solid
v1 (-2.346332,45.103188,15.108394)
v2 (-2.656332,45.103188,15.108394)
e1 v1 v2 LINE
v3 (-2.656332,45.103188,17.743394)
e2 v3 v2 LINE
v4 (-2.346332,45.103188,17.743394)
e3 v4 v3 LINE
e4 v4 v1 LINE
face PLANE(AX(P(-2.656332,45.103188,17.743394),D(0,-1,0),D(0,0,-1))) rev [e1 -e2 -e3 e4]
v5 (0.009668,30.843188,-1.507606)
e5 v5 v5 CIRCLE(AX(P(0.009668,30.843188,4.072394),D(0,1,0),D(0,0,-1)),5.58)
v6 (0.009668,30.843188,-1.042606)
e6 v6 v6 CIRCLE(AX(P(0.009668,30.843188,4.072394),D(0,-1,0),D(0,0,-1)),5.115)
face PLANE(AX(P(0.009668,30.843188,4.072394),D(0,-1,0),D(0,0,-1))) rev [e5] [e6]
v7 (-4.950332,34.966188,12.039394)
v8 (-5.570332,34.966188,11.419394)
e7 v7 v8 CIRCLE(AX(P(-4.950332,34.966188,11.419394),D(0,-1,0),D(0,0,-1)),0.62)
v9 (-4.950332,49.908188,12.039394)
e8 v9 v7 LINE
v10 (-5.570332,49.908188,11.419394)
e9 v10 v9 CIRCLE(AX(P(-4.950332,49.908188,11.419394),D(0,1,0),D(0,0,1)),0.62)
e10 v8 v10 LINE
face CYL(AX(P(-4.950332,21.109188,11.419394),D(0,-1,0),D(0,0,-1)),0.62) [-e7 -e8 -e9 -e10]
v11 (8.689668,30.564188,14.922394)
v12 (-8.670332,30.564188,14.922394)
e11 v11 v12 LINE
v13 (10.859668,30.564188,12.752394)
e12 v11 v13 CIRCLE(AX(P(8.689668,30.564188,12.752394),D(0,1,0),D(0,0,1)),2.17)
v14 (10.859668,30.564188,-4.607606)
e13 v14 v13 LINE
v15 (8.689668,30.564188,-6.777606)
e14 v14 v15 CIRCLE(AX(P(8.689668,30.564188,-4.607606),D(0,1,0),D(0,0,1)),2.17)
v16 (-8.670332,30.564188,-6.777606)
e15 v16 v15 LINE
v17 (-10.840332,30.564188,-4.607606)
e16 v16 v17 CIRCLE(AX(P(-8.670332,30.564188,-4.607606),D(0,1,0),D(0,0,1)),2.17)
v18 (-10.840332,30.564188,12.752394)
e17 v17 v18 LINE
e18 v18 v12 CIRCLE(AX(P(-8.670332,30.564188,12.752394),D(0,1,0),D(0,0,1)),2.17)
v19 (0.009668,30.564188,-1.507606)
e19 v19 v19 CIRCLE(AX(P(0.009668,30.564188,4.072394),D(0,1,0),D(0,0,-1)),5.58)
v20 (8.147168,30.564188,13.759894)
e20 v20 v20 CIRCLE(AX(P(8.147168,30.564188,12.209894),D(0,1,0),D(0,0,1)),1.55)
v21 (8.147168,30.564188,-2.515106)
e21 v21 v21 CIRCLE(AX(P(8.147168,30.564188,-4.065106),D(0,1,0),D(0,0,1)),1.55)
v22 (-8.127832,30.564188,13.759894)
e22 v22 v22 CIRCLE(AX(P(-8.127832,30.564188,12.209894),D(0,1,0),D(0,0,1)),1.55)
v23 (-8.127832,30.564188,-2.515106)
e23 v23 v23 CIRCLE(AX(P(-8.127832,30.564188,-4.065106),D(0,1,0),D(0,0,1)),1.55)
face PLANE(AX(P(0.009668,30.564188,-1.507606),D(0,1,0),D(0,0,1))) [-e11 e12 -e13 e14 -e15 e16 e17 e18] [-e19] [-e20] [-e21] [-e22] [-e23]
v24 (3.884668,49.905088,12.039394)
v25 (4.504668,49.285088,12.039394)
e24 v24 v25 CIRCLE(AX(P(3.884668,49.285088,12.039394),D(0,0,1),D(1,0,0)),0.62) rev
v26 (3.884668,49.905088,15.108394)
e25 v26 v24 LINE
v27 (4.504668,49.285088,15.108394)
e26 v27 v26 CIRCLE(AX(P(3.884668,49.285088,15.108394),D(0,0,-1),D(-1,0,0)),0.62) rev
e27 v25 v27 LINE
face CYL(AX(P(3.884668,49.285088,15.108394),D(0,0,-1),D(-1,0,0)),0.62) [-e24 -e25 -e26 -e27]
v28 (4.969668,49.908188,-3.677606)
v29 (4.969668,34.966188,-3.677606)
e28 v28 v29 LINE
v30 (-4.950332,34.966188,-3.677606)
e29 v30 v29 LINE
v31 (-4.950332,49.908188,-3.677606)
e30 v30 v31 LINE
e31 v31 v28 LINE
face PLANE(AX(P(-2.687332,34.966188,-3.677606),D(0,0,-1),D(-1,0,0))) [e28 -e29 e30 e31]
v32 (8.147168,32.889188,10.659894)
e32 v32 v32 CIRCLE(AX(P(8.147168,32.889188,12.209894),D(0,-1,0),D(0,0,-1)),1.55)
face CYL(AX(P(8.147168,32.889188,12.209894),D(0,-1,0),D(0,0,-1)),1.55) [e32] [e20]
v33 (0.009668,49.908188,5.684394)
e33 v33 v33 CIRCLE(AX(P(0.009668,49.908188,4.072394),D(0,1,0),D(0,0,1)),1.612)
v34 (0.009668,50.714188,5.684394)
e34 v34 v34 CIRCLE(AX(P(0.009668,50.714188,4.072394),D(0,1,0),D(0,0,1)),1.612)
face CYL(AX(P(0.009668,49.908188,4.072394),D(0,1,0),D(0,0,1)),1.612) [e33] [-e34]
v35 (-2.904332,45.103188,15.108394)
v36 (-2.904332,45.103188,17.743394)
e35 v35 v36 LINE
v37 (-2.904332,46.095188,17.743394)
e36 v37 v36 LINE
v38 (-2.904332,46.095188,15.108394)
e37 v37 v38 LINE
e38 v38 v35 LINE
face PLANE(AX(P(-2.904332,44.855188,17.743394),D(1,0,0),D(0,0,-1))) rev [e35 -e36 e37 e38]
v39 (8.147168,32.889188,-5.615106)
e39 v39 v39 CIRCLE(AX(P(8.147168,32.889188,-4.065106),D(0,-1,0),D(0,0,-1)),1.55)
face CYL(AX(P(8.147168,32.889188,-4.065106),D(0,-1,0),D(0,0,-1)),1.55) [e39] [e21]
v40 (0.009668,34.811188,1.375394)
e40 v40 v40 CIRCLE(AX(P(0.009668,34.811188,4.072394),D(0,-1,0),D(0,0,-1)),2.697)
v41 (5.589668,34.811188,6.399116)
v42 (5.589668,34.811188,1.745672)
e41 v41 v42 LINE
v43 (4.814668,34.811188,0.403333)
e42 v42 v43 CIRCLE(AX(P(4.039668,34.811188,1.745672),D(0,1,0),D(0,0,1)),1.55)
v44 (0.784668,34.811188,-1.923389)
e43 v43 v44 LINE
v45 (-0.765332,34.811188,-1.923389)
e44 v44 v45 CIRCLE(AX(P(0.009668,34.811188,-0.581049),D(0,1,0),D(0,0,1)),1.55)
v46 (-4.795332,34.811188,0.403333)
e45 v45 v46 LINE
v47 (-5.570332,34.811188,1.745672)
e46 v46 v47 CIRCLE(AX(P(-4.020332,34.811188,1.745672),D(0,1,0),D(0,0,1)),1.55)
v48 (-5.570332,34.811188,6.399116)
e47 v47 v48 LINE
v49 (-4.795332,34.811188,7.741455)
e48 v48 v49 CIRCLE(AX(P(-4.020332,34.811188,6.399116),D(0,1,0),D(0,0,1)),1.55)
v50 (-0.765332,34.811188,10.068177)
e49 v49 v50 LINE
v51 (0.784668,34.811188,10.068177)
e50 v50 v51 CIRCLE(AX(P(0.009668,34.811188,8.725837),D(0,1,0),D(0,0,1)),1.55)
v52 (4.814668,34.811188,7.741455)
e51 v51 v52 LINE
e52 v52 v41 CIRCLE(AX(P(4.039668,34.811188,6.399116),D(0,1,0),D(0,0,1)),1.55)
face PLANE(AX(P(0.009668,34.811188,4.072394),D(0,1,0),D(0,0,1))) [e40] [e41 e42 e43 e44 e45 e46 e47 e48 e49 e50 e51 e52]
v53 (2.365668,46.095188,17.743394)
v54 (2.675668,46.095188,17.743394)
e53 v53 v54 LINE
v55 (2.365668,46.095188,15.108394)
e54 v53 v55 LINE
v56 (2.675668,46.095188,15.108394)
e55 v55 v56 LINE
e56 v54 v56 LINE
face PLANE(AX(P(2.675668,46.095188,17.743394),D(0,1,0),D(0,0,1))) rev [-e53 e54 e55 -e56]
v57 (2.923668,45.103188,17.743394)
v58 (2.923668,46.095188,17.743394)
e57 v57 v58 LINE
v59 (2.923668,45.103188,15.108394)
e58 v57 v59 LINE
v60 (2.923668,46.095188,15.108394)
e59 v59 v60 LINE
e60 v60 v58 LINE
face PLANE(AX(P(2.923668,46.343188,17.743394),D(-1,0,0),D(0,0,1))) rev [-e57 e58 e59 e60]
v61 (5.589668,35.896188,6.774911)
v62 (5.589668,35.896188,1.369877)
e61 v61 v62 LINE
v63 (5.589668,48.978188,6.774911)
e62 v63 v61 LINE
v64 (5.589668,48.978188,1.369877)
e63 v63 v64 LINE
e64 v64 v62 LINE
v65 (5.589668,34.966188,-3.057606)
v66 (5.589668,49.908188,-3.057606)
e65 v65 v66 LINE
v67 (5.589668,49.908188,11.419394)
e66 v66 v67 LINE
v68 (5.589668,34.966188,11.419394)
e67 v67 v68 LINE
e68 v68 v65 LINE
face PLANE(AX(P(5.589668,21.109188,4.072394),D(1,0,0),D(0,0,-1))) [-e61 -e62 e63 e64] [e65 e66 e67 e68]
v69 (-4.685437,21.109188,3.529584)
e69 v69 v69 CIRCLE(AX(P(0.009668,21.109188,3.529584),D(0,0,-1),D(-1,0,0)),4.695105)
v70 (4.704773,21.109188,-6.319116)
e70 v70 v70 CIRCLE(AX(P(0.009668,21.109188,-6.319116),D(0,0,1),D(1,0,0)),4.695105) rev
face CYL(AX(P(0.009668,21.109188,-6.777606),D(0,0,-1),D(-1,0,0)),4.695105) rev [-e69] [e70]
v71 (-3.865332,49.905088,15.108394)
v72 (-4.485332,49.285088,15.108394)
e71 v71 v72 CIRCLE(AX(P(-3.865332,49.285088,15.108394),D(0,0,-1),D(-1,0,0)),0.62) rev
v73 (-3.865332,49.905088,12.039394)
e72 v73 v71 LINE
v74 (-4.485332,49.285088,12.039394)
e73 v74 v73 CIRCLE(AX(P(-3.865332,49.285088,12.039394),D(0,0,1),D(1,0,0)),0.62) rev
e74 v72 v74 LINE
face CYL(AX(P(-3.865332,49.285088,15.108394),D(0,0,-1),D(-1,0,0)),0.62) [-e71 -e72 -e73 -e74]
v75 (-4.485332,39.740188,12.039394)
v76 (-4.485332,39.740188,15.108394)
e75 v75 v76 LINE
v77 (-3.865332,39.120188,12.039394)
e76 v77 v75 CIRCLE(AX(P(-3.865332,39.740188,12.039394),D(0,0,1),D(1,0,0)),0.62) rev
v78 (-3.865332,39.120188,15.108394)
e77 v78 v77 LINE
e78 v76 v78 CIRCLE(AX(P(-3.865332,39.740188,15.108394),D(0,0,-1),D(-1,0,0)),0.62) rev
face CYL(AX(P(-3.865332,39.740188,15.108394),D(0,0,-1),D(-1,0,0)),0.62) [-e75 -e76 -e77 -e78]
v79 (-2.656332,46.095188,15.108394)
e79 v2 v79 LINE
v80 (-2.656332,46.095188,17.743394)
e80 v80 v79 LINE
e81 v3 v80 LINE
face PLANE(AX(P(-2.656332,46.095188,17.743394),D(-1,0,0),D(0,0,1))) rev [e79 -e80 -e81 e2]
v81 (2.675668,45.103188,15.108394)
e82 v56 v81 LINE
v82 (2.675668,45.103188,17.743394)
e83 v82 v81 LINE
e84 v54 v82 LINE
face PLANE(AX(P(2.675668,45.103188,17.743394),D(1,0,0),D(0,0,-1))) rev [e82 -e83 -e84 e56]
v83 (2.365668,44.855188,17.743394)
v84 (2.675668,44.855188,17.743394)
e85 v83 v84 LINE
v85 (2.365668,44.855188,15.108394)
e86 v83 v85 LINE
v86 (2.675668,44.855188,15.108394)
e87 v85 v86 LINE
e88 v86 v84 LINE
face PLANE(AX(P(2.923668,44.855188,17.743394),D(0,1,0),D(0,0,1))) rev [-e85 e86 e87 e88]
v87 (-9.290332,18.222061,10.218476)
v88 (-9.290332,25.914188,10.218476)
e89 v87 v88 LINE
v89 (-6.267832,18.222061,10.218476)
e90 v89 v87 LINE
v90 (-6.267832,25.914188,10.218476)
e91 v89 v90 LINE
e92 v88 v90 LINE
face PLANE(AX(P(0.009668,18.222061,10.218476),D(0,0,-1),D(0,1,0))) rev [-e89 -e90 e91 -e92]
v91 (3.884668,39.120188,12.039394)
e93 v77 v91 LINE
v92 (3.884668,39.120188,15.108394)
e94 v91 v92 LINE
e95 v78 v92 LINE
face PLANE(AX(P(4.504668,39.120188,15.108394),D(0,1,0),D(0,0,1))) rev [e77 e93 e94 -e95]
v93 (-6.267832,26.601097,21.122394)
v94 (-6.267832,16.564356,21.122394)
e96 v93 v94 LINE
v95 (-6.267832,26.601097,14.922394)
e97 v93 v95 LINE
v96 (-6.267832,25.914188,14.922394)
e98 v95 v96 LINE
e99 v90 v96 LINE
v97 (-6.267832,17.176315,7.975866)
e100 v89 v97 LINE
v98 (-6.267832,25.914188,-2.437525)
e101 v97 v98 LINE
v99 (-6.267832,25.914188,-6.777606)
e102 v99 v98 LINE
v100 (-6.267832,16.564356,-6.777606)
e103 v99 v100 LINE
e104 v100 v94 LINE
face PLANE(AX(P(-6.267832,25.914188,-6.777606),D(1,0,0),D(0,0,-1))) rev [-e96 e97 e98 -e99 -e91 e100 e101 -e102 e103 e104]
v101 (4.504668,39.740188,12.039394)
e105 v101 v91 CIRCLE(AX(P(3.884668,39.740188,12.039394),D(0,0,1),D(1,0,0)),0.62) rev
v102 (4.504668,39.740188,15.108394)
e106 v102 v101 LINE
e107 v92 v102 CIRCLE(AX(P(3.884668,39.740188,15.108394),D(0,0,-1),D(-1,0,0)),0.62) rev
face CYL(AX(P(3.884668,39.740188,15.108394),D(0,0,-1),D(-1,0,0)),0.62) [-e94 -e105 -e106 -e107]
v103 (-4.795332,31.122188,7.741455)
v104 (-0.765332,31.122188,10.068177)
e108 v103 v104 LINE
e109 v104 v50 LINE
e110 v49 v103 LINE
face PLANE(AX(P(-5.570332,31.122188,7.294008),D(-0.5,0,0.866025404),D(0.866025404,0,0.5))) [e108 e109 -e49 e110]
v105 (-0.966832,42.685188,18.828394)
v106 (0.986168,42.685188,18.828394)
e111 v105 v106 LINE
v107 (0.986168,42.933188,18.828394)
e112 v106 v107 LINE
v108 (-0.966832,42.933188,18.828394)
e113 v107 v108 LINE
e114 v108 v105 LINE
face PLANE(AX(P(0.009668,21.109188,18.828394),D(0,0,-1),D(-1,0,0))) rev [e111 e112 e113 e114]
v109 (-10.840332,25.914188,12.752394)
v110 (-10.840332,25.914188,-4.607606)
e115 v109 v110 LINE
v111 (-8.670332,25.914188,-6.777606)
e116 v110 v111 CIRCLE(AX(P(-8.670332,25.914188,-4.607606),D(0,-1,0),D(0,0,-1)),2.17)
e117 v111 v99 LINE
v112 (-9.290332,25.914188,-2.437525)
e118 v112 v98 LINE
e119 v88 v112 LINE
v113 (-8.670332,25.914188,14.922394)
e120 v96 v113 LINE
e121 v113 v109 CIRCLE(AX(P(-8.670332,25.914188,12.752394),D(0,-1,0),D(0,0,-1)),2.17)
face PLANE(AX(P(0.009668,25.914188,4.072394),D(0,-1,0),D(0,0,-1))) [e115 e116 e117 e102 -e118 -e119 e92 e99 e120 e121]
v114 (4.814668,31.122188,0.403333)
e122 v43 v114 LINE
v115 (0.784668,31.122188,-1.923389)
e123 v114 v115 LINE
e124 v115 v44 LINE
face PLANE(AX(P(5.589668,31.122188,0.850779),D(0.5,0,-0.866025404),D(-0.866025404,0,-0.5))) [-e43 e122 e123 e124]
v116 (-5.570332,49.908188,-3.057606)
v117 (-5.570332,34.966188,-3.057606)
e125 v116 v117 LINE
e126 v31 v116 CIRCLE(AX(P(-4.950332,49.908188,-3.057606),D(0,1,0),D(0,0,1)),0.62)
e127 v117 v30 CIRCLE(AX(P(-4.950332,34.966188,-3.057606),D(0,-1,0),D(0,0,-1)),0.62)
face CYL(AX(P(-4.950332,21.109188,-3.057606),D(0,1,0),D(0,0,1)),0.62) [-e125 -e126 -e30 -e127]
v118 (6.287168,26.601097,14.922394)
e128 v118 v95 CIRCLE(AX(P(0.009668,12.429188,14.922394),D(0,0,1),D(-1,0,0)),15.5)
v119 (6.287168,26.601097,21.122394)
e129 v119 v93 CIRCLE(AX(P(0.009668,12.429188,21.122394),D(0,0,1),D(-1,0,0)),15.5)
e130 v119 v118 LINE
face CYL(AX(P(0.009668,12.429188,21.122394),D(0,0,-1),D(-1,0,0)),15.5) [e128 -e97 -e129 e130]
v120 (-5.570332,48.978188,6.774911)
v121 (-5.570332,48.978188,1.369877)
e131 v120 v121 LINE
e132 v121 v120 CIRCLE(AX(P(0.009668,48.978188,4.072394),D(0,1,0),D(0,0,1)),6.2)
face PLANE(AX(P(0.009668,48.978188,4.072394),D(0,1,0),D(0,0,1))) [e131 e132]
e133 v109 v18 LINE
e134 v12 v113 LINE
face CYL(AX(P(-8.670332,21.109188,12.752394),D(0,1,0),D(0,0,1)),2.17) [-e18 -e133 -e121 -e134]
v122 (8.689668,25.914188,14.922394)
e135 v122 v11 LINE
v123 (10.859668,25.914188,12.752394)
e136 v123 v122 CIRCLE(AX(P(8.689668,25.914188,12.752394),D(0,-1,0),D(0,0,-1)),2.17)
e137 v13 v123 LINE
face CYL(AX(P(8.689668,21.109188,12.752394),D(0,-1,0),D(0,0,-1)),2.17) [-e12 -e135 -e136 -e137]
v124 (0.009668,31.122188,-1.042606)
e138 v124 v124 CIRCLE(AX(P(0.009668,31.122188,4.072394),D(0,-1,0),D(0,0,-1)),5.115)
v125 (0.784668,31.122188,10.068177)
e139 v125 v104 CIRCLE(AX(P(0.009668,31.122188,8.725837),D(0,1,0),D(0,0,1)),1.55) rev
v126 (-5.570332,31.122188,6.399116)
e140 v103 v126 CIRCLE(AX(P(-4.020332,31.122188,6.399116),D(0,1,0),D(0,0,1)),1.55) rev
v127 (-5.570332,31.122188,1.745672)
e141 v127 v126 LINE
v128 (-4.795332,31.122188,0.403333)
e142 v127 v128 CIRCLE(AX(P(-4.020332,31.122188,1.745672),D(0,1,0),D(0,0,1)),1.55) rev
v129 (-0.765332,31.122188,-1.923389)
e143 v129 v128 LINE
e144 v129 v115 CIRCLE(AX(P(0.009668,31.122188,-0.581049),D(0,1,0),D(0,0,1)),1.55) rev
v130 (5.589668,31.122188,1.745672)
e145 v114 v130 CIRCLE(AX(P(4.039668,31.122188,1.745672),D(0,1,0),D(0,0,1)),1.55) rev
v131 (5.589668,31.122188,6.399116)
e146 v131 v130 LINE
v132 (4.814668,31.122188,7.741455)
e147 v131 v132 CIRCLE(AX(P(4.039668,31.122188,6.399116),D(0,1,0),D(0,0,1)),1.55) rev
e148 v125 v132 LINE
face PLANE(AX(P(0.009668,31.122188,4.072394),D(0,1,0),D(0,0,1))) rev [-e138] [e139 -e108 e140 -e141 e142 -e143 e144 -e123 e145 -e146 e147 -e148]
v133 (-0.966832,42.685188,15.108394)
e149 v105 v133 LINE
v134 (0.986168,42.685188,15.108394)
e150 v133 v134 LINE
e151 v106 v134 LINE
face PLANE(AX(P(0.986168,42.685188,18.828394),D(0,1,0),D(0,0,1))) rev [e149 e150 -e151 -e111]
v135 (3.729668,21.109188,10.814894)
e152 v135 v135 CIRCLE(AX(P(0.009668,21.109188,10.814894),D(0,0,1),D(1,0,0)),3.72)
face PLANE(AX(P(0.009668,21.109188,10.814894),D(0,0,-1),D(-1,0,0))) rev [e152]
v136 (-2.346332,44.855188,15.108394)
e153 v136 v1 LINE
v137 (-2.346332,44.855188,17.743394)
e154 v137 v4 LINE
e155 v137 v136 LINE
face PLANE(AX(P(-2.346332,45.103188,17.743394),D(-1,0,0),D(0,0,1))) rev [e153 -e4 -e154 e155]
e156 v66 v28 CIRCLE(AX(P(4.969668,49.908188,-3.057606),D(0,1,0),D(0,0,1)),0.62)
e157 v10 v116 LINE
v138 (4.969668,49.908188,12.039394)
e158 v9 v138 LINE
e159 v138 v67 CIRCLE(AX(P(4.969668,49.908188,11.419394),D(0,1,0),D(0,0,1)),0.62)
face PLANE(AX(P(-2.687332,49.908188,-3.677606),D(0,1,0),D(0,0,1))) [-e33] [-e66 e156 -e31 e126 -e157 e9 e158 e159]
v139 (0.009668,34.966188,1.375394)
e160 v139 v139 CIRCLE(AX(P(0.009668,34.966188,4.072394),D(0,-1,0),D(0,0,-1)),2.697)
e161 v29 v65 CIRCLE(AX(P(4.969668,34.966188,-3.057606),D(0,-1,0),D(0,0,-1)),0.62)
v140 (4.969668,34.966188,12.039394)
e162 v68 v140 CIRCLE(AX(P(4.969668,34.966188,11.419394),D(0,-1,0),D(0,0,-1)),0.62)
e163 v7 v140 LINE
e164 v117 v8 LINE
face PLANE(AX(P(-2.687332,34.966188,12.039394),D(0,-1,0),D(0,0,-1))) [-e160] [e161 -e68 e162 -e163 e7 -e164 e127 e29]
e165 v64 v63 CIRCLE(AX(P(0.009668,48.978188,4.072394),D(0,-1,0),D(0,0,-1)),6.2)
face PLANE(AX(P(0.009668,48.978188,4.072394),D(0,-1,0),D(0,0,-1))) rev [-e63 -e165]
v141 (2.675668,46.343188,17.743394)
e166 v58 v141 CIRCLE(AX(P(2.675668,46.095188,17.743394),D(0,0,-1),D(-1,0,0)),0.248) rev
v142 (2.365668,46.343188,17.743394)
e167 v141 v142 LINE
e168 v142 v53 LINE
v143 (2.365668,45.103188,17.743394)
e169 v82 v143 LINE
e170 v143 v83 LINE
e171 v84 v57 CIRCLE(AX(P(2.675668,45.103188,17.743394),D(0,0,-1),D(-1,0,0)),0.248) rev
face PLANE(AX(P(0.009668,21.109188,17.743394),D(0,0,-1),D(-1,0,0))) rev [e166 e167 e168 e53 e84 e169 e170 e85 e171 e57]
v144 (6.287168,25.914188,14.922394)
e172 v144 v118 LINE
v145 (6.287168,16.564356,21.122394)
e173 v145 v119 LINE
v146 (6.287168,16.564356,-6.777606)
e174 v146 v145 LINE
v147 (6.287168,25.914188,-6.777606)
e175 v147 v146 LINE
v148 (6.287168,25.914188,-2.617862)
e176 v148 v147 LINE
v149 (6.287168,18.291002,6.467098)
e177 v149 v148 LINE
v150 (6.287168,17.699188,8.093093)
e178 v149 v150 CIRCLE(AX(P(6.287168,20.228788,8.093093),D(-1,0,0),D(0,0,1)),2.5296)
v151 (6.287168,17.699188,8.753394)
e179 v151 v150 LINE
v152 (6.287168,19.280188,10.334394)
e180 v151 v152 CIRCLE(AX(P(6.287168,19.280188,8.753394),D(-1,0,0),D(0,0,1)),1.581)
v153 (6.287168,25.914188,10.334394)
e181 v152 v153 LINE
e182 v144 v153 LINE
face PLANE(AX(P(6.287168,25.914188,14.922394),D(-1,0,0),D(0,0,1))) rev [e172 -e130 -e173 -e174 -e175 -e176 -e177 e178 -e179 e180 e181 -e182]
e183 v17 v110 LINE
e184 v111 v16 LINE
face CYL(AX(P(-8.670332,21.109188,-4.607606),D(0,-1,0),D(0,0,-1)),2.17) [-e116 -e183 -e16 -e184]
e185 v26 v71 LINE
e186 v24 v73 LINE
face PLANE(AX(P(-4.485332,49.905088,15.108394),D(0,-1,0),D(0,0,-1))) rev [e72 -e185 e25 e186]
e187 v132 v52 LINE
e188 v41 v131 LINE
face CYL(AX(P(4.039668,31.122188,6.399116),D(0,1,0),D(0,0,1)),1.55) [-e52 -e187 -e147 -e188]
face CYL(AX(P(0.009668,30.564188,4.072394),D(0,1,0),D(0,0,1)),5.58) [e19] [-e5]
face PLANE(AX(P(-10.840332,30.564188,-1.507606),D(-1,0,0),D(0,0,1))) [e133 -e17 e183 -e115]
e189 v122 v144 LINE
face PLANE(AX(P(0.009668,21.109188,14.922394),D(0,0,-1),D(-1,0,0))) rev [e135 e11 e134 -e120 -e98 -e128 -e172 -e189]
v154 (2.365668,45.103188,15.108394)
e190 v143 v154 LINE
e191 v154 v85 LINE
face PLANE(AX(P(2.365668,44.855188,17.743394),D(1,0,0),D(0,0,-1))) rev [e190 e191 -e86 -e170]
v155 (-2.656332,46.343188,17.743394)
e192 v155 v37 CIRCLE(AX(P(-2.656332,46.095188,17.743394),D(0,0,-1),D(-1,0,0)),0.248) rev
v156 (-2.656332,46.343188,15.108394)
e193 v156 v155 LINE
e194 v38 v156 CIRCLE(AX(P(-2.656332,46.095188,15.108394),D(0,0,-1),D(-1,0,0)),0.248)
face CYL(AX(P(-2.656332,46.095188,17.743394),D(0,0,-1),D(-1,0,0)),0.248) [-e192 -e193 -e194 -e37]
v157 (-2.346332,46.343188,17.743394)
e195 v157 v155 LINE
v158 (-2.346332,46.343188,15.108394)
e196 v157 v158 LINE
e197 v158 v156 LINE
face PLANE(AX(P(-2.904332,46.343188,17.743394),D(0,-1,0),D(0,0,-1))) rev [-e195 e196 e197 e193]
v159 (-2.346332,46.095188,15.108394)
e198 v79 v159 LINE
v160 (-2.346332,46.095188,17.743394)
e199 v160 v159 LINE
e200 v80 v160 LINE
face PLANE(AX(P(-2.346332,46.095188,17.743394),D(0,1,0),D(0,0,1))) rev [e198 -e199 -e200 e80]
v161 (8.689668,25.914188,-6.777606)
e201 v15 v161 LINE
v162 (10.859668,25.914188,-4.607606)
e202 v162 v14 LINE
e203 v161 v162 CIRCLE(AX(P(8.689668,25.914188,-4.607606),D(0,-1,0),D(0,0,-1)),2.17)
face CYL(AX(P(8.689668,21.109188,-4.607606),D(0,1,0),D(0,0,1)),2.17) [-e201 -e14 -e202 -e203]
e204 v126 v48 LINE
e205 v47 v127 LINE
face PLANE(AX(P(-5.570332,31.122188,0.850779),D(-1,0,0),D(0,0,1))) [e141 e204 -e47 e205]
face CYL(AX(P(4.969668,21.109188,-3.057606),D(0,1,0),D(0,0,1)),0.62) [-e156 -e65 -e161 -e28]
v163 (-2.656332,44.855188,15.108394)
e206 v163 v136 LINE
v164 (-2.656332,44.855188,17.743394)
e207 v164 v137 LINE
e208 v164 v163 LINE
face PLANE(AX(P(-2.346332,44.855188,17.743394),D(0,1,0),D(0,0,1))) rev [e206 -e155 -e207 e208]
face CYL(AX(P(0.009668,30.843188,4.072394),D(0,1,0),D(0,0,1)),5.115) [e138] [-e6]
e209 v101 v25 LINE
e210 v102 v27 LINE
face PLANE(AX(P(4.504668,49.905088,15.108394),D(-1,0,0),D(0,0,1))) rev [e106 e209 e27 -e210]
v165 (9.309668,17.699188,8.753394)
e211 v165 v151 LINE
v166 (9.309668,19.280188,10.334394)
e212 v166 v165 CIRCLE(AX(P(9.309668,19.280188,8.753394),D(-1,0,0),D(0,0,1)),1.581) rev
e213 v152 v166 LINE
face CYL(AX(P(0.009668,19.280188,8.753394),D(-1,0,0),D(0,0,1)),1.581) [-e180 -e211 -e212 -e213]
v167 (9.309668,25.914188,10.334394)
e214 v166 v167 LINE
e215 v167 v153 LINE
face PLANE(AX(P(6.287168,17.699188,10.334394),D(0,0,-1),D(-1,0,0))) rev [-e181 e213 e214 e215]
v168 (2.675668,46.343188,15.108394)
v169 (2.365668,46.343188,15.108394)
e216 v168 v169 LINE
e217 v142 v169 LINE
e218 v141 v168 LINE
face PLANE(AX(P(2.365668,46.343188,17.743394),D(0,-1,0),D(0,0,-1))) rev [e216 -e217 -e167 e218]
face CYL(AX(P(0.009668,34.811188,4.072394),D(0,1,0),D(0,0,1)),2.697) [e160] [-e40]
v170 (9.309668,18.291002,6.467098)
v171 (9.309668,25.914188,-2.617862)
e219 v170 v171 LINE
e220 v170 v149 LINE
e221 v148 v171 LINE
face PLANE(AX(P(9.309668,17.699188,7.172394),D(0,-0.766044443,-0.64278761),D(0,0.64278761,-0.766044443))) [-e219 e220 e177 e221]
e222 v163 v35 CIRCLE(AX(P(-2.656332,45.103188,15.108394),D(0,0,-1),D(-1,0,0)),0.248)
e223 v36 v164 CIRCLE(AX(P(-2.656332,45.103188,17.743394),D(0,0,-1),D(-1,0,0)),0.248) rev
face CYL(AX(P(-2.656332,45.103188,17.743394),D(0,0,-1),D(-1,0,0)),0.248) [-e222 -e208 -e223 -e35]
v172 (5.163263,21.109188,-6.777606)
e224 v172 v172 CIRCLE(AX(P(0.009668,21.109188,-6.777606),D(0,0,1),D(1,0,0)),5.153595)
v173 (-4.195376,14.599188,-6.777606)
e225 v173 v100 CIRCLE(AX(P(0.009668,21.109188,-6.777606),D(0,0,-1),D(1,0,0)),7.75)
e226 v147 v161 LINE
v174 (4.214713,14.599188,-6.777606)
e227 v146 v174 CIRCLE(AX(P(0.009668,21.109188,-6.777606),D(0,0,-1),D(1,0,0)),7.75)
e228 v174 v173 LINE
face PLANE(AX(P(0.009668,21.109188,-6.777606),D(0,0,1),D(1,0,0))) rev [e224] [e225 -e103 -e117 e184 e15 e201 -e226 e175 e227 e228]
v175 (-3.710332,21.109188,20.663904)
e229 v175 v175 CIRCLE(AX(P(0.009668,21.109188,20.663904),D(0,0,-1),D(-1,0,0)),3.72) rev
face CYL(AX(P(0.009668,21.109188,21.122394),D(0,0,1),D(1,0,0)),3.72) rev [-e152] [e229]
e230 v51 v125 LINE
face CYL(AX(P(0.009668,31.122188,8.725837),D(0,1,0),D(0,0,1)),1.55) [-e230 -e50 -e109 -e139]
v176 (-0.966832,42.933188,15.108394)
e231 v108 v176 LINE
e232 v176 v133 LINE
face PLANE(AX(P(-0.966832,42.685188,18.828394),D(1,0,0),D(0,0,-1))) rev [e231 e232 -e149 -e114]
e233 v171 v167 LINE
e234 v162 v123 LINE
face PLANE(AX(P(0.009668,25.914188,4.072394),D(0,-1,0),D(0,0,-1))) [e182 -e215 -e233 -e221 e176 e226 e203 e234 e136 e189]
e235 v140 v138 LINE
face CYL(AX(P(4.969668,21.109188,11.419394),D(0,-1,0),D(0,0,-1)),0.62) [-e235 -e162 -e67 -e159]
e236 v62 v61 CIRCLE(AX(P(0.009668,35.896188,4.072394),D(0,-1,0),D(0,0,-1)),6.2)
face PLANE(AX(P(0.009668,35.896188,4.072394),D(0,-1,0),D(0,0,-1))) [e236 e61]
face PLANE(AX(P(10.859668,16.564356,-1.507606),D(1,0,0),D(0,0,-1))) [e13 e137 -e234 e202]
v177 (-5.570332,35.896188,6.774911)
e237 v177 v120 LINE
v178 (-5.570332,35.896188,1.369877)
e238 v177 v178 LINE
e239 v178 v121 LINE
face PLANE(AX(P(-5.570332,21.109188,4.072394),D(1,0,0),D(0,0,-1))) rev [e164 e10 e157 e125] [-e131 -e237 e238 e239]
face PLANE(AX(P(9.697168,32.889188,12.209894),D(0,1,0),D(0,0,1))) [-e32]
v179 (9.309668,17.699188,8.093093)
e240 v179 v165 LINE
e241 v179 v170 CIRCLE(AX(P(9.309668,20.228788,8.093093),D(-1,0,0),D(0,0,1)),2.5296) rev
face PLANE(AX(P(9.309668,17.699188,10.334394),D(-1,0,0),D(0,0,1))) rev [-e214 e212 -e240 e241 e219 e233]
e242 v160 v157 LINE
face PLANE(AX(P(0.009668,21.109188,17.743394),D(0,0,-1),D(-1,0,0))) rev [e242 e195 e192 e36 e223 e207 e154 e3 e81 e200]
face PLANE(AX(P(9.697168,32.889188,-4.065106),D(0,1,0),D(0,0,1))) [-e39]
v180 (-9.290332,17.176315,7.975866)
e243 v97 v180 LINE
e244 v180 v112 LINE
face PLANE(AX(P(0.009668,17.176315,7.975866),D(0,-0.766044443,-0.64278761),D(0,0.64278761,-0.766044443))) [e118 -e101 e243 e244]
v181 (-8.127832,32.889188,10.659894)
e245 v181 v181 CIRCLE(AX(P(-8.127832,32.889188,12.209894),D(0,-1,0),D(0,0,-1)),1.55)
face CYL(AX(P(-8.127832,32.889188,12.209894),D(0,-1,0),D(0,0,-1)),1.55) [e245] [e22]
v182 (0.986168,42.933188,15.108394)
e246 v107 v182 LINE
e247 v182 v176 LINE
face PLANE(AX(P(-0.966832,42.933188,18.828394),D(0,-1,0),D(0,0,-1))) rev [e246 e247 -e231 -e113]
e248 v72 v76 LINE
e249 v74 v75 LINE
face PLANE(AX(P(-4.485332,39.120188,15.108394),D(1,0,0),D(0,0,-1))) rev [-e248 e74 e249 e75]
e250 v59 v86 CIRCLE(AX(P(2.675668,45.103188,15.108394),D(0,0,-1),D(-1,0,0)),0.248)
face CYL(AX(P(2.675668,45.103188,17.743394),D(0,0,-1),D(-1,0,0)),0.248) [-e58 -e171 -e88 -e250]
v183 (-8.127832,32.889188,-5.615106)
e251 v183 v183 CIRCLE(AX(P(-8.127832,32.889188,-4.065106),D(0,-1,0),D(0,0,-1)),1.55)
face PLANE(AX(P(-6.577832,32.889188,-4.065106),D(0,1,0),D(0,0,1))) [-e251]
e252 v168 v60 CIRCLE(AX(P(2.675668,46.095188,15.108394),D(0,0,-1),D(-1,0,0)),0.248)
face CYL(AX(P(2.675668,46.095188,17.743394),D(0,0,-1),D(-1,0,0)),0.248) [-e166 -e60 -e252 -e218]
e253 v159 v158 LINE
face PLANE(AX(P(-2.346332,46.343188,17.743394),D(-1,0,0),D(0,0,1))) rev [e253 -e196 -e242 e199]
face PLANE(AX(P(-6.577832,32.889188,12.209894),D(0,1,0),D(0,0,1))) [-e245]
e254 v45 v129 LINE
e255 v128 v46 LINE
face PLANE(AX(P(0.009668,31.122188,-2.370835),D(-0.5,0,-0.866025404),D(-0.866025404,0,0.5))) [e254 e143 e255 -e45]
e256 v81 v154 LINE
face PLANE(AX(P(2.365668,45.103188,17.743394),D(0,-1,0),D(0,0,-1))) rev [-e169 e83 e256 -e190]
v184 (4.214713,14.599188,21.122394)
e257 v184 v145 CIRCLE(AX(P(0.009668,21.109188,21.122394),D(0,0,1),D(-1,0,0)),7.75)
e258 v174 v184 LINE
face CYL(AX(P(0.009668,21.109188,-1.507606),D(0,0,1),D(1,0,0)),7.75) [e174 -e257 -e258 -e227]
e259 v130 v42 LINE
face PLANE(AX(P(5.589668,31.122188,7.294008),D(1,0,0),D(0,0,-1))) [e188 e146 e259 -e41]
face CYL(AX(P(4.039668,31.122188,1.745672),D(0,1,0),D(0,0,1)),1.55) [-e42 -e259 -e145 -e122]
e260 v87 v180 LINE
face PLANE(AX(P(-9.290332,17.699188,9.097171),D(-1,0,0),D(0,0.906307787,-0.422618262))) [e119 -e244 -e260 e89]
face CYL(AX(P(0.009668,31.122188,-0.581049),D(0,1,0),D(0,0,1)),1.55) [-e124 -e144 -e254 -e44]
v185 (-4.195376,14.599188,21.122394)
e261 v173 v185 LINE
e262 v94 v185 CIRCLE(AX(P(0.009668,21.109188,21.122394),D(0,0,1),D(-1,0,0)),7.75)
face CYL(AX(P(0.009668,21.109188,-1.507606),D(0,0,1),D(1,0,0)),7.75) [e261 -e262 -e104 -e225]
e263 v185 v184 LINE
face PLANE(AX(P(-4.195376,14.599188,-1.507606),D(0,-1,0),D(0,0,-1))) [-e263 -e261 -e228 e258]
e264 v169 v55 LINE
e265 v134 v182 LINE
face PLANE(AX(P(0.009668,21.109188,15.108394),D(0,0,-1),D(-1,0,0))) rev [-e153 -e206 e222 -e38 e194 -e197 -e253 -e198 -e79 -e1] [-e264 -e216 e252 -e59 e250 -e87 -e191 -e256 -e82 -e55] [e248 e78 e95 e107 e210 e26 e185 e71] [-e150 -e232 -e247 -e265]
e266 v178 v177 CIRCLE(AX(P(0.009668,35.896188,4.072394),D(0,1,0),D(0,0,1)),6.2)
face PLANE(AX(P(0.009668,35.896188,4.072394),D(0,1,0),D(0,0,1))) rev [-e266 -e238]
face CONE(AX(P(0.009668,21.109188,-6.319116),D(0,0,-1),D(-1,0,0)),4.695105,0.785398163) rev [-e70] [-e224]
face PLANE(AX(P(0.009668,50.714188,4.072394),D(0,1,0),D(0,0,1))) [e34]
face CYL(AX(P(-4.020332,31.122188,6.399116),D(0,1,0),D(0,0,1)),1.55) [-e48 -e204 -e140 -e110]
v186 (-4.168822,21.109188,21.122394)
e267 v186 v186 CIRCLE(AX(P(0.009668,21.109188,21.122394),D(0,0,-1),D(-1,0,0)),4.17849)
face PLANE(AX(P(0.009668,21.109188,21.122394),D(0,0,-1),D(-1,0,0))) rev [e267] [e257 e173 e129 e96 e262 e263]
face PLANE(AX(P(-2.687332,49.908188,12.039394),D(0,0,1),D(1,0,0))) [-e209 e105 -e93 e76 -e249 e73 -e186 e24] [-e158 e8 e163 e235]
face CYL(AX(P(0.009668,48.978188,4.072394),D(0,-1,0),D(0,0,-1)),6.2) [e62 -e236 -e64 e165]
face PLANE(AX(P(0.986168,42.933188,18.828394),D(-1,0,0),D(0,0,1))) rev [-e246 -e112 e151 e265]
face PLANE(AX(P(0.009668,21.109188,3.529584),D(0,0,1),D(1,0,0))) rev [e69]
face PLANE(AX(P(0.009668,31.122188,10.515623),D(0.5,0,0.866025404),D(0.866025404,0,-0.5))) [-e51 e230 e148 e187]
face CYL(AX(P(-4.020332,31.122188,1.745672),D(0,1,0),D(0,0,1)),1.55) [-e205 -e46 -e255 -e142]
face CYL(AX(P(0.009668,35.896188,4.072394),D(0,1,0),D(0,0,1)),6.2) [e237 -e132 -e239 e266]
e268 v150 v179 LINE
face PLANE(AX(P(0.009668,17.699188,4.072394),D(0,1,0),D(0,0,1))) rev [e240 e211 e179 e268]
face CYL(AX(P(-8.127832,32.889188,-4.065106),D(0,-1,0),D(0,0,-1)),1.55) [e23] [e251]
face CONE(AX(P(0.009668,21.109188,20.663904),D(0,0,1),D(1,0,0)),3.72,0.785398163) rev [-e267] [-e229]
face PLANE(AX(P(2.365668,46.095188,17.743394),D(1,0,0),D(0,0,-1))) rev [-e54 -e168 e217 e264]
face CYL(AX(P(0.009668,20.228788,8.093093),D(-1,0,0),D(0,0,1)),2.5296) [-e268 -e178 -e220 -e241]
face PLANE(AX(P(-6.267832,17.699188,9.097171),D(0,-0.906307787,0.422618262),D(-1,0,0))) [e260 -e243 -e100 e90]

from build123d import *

# Parameters (mm, degrees)
IZIM1_W                      = 50.7
IZIM1_H                      = 48.2
Y_KSEKLIK_EKSTR_ZYON1_DEPTH  = 26.7
IZIM2_R                      = 8.7
Y_KSEKLIK_EKSTR_ZYON2_DEPTH  = 0.5
Y_KSEKLIK_EKSTR_ZYON3_DEPTH  = 11.9
IZIM4_R                      = 16.5
Y_KSEKLIK_EKSTR_ZYON4_DEPTH  = 0.9
IZIM5_R                      = 18
Y_KSEKLIK_EKSTR_ZYON5_DEPTH  = 0.9
Y_KSEKLIK_EKSTR_ZYON6_DEPTH  = 36
Y_KSEKLIK_EKSTR_ZYON7_DEPTH  = 17
Y_KSEKLIK_EKSTR_ZYON8_START  = 17
Y_KSEKLIK_EKSTR_ZYON8_DEPTH  = 17
IZIM9_W                      = 14.75
IZIM9_H                      = 70
KES_EKSTR_ZYON1_DEPTH        = 30.160746911
IZIM10_W                     = 14.75
IZIM10_H                     = 70
KES_EKSTR_ZYON2_DEPTH        = 30.160746911
IZIM11_W                     = 50.7
IZIM11_H                     = 48.2
Y_KSEKLIK_EKSTR_ZYON9_DEPTH  = 9.3
Y_KSEKLIK_EKSTR_ZYON10_START = 20
Y_KSEKLIK_EKSTR_ZYON10_DEPTH = 20
IZIM13_W                     = 9.75
IZIM13_H                     = 10.2
Y_KSEKLIK_EKSTR_ZYON11_DEPTH = 26.5
Y_KSEKLIK_EKSTR_ZYON12_DEPTH = 42.2
Y_KSEKLIK_EKSTR_ZYON13_START = -42.2
Y_KSEKLIK_EKSTR_ZYON13_DEPTH = 42.2
IZIM16_W                     = 29
IZIM16_H                     = 34.79
Y_KSEKLIK_EKSTR_ZYON14_DEPTH = 9.9
Y_KSEKLIK_EKSTR_ZYON15_DEPTH = 8.5
Y_KSEKLIK_EKSTR_ZYON16_DEPTH = 8.5
IZIM19_W                     = 6.3
IZIM19_H                     = 0.8
Y_KSEKLIK_EKSTR_ZYON17_DEPTH = 12
DRAFT1_ANGLE                 = 50
IZIM20_W                     = 5
IZIM20_H                     = 7.5
IZIM21_W                     = 5
IZIM21_H                     = 7.5
IZIM22_W                     = 5
IZIM22_H                     = 7.5
IZIM23_W                     = 5
IZIM23_H                     = 7.5
IZIM24_W                     = 5.2
IZIM24_H                     = 2.6
M20_BO_LUKLU_DELIK1_D        = 24
M20_BO_LUKLU_DELIK1_DEPTH    = 33.25
M27_BO_LUKLU_DELIK2_D        = 30.291
M27_BO_LUKLU_DELIK2_DEPTH    = 33.249
FEDER1_START                 = -30
FEDER1_DEPTH                 = 9.75
PAH1_SIZE                    = 1.479
RADYUS1_R                    = 0.8
RADYUS2_R                    = 2
RADYUS3_R                    = 5
RADYUS4_R                    = 5.1
RADYUS5_R                    = 7
RADYUS6_R                    = 8.16
L_EK1_SCALE                  = 0.31


# Read off the part's stored shape, not the designer's step: Feder1
with BuildPart() as part:
    # Çizim1 → Yükseklik-Ekstrüzyon1 (new body)
    with BuildSketch(Plane(origin=(18, 0, 0), x_dir=(0, 0, -1), z_dir=(1, 0, 0))):
        with Locations((-0.35, 68.8)):
            Rectangle(IZIM1_W, IZIM1_H)
    extrude(amount=-Y_KSEKLIK_EKSTR_ZYON1_DEPTH)

    # Çizim2 → Yükseklik-Ekstrüzyon2 (add)
    with BuildSketch(Plane.XZ.offset(-44.7)):
        with Locations(Location((0, 0, 0), (0, 0, 180))):
            Circle(IZIM2_R)
    extrude(amount=Y_KSEKLIK_EKSTR_ZYON2_DEPTH)

    # Çizim3 → Yükseklik-Ekstrüzyon3 (add)
    with BuildSketch(Plane(origin=(0, 44.2, 0), x_dir=(1, 0, 0), z_dir=(0, 1, 0))):
        Polygon((-18, 10.392304845), (-18, -10.392304845), (0, -20.784609691), (18, -10.392304845), (18, 10.392304845), (0, 20.784609691), align=None)
    extrude(amount=-Y_KSEKLIK_EKSTR_ZYON3_DEPTH)

    # Çizim4 → Yükseklik-Ekstrüzyon4 (add)
    with BuildSketch(Plane.XZ.offset(-32.3)):
        with Locations(Location((0, 0, 0), (0, 0, 270))):
            Circle(IZIM4_R)
    extrude(amount=Y_KSEKLIK_EKSTR_ZYON4_DEPTH)

    # Çizim5 → Yükseklik-Ekstrüzyon5 (add)
    with BuildSketch(Plane(origin=(0, 31.4, 0), x_dir=(1, 0, 0), z_dir=(0, 1, 0))):
        with Locations(Location((0, 0, 0), (0, 0, 90))):
            Circle(IZIM5_R)
    extrude(amount=-Y_KSEKLIK_EKSTR_ZYON5_DEPTH)

    # Çizim6 → Yükseklik-Ekstrüzyon6 (add)
    with BuildSketch(Plane.XY.offset(18)):
        with BuildLine():
            Line((-13.564659966, -21), (13.564659966, -21))
            ThreePointArc((13.564659966, -21), (17.201870235, -18.14099392), (20.25, -14.660746911))
            Line((20.25, -14.660746911), (35, -14.660746911))
            Line((35, -14.660746911), (35, 30.5))
            Line((35, 30.5), (0, 30.5))
            Line((0, 30.5), (-35, 30.5))
            Line((-35, 30.5), (-35, -14.660746911))
            Line((-35, -14.660746911), (-20.25, -14.660746911))
            ThreePointArc((-20.25, -14.660746911), (-17.201870235, -18.14099392), (-13.564659966, -21))
        make_face()
    extrude(amount=-Y_KSEKLIK_EKSTR_ZYON6_DEPTH)

    # Çizim7 → Yükseklik-Ekstrüzyon7 (add)
    with BuildSketch(Plane(origin=(0, 0, -18), x_dir=(-1, 0, 0), z_dir=(0, 0, -1))):
        with BuildLine():
            Line((13.564659966, -21), (-13.564659966, -21))
            ThreePointArc((-13.564659966, -21), (-17.201870235, -18.14099392), (-20.25, -14.660746911))
            Line((-20.25, -14.660746911), (-35, -14.660746911))
            Line((-35, -14.660746911), (-35, 30.5))
            Line((-35, 30.5), (35, 30.5))
            Line((35, 30.5), (35, -14.660746911))
            Line((35, -14.660746911), (20.25, -14.660746911))
            ThreePointArc((20.25, -14.660746911), (17.201870235, -18.14099392), (13.564659966, -21))
        make_face()
    extrude(amount=Y_KSEKLIK_EKSTR_ZYON7_DEPTH)

    # Çizim8 → Yükseklik-Ekstrüzyon8 (add)
    with BuildSketch(Plane.XY.offset(18).offset(Y_KSEKLIK_EKSTR_ZYON8_START)):
        with BuildLine():
            Line((13.564659966, -21), (-13.564659966, -21))
            ThreePointArc((-13.564659966, -21), (-17.201870235, -18.14099392), (-20.25, -14.660746911))
            Line((-20.25, -14.660746911), (-35, -14.660746911))
            Line((-35, -14.660746911), (-35, 30.5))
            Line((-35, 30.5), (35, 30.5))
            Line((35, 30.5), (35, -14.660746911))
            Line((35, -14.660746911), (20.25, -14.660746911))
            ThreePointArc((20.25, -14.660746911), (17.201870235, -18.14099392), (13.564659966, -21))
        make_face()
    extrude(amount=-Y_KSEKLIK_EKSTR_ZYON8_DEPTH)

    # Çizim9 → Kes-Ekstrüzyon1 (cut)
    with BuildSketch(Plane.XZ.offset(14.660746911)):
        with Locations((27.625, 0)):
            Rectangle(IZIM9_W, IZIM9_H)
    extrude(amount=-KES_EKSTR_ZYON1_DEPTH, mode=Mode.SUBTRACT)

    # Çizim10 → Kes-Ekstrüzyon2 (cut)
    with BuildSketch(Plane.XZ.offset(14.660746911)):
        with Locations((-27.625, 0)):
            Rectangle(IZIM10_W, IZIM10_H)
    extrude(amount=-KES_EKSTR_ZYON2_DEPTH, mode=Mode.SUBTRACT)

    # Çizim11 → Yükseklik-Ekstrüzyon9 (add)
    with BuildSketch(Plane.ZY.offset(8.7)):
        with Locations((0.35, 68.8)):
            Rectangle(IZIM11_W, IZIM11_H)
    extrude(amount=Y_KSEKLIK_EKSTR_ZYON9_DEPTH)

    # Çizim12 → Yükseklik-Ekstrüzyon10 (add)
    with BuildSketch(Plane.XY.offset(35).offset(Y_KSEKLIK_EKSTR_ZYON10_START)):
        with BuildLine():
            Line((-20.25, -14.660746911), (-20.25, 17.715834237))
            ThreePointArc((-20.25, 17.715834237), (0, 22), (20.25, 17.715834237))
            Line((20.25, 17.715834237), (20.25, -14.660746911))
            ThreePointArc((20.25, -14.660746911), (17.201870235, -18.14099392), (13.564659966, -21))
            Line((13.564659966, -21), (-13.564659966, -21))
            ThreePointArc((-13.564659966, -21), (-17.201870235, -18.14099392), (-20.25, -14.660746911))
        make_face()
    extrude(amount=-Y_KSEKLIK_EKSTR_ZYON10_DEPTH)

    # Çizim13 → Yükseklik-Ekstrüzyon11 (add)
    with BuildSketch(Plane.XZ.offset(-15.5)):
        with Locations((25.125, 15.1)):
            Rectangle(IZIM13_W, IZIM13_H)
    extrude(amount=Y_KSEKLIK_EKSTR_ZYON11_DEPTH)

    # Çizim14 → Yükseklik-Ekstrüzyon12 (add)
    with BuildSketch(Plane(origin=(0, 89.9, 0), x_dir=(1, 0, 0), z_dir=(0, 1, 0))):
        with BuildLine():
            Line((-18, -8.717797887), (-18, 8.717797887))
            ThreePointArc((-18, 8.717797887), (-20, 0), (-18, -8.717797887))
        make_face()
    extrude(amount=-Y_KSEKLIK_EKSTR_ZYON12_DEPTH)

    # Çizim15 → Yükseklik-Ekstrüzyon13 (add)
    with BuildSketch(Plane.XZ.offset(-47.7).offset(Y_KSEKLIK_EKSTR_ZYON13_START)):
        with BuildLine():
            Line((18, 8.717797887), (18, -8.717797887))
            ThreePointArc((18, -8.717797887), (20, 0), (18, 8.717797887))
        make_face()
    extrude(amount=Y_KSEKLIK_EKSTR_ZYON13_DEPTH)

    # Çizim16 → Yükseklik-Ekstrüzyon14 (add)
    with BuildSketch(Plane.XY.offset(25.7)):
        with Locations((0, 75.495)):
            Rectangle(IZIM16_W, IZIM16_H)
    extrude(amount=Y_KSEKLIK_EKSTR_ZYON14_DEPTH)

    # Çizim17 → Yükseklik-Ekstrüzyon15 (add)
    with BuildSketch(Plane.XY.offset(35.6)):
        Polygon((-9.4, 81.4), (-7.6, 81.4), (-7.6, 80.6), (-8.6, 80.6), (-8.6, 77.4), (-7.6, 77.4), (-7.6, 76.6), (-9.4, 76.6), align=None)
    extrude(amount=Y_KSEKLIK_EKSTR_ZYON15_DEPTH)

    # Çizim18 → Yükseklik-Ekstrüzyon16 (add)
    with BuildSketch(Plane.XY.offset(35.6)):
        Polygon((7.6, 77.4), (8.6, 77.4), (8.6, 80.6), (7.6, 80.6), (7.6, 81.4), (9.4, 81.4), (9.4, 76.6), (7.6, 76.6), align=None)
    extrude(amount=Y_KSEKLIK_EKSTR_ZYON16_DEPTH)

    # Çizim19 → Yükseklik-Ekstrüzyon17 (add)
    with BuildSketch(Plane.XY.offset(35.6)):
        with Locations((0, 70)):
            Rectangle(IZIM19_W, IZIM19_H)
    extrude(amount=Y_KSEKLIK_EKSTR_ZYON17_DEPTH)

    # Draft1
    draft1_faces = [part.faces().sort_by_distance(p)[0] for p in [
        (25.125, 2.25, 10),
    ]]
    draft(draft1_faces, Plane(origin=(0, -11, 0), x_dir=(0, 0, -1), z_dir=(0, -1, 0)), DRAFT1_ANGLE)

    # Çizim20 → Döndür1 (revolve)
    with BuildSketch(Plane.XY.offset(26.25), mode=Mode.PRIVATE) as d_nd_r1_sk:
        with Locations((-23.75, 34.25)):
            Rectangle(IZIM20_W, IZIM20_H)
    revolve(d_nd_r1_sk.sketch.rotate(Axis((-26.25, 38, 26.25), (0, -1, 0)), 270), axis=Axis((-26.25, 38, 26.25), (0, -1, 0)))

    # Çizim21 → Döndür2 (revolve)
    with BuildSketch(Plane.XY.offset(-26.25), mode=Mode.PRIVATE) as d_nd_r2_sk:
        with Locations((-23.75, 34.25)):
            Rectangle(IZIM21_W, IZIM21_H)
    revolve(d_nd_r2_sk.sketch.rotate(Axis((-26.25, 38, -26.25), (0, -1, 0)), 270), axis=Axis((-26.25, 38, -26.25), (0, -1, 0)))

    # Çizim22 → Döndür3 (revolve)
    with BuildSketch(Plane.XY.offset(-26.25), mode=Mode.PRIVATE) as d_nd_r3_sk:
        with Locations((28.75, 34.25)):
            Rectangle(IZIM22_W, IZIM22_H)
    revolve(d_nd_r3_sk.sketch.rotate(Axis((26.25, 38, -26.25), (0, -1, 0)), 270), axis=Axis((26.25, 38, -26.25), (0, -1, 0)))

    # Çizim23 → Döndür4 (revolve)
    with BuildSketch(Plane.XY.offset(26.25), mode=Mode.PRIVATE) as d_nd_r4_sk:
        with Locations((28.75, 34.25)):
            Rectangle(IZIM23_W, IZIM23_H)
    revolve(d_nd_r4_sk.sketch.rotate(Axis((26.25, 38, 26.25), (0, -1, 0)), 270), axis=Axis((26.25, 38, 26.25), (0, -1, 0)))

    # Çizim24 → Döndür5 (revolve)
    with BuildSketch(Plane(origin=(0, 0, 0), x_dir=(-1, 0, 0), z_dir=(0, 0, -1)), mode=Mode.PRIVATE) as d_nd_r5_sk:
        with Locations((-2.6, 94.2)):
            Rectangle(IZIM24_W, IZIM24_H)
    revolve(d_nd_r5_sk.sketch.rotate(Axis((0, 92.9, 0), (0, 1, 0)), 90), axis=Axis((0, 92.9, 0), (0, 1, 0)))

    # M20 Boşluklu Delik1
    with Locations(Plane.XY.offset(55)):
        with Locations((0, 0)):
            Hole(M20_BO_LUKLU_DELIK1_D / 2, depth=M20_BO_LUKLU_DELIK1_DEPTH)

    # M27 Boşluklu Delik2
    with Locations(Plane(origin=(0, 0, -35), x_dir=(-1, 0, 0), z_dir=(0, 0, -1))):
        with Locations((0, 0)):
            Hole(M27_BO_LUKLU_DELIK2_D / 2, depth=M27_BO_LUKLU_DELIK2_DEPTH)

    # Feder1 outline → Feder1 (add)
    with BuildSketch(Plane.YZ.offset(FEDER1_START)):
        Polygon((15.5, 19.826070485), (-9.313312955, 19.826070485), (-12.686687045, 12.591846402), (15.5, -20.999739147), align=None)
    extrude(amount=FEDER1_DEPTH)

    # Pah1
    pah1_edges = [part.edges().sort_by_distance(p)[0] for p in [
        (12, 0, 55),
        (-15.1455, 0, -35),
    ]]
    chamfer(pah1_edges, length=PAH1_SIZE)

    # Radyus1
    radyus1_edges = [part.edges().sort_by_distance(p)[0] for p in [
        (-9.4, 81.4, 39.85),
        (-9.4, 76.6, 39.85),
        (9.4, 76.6, 39.85),
        (9.4, 81.4, 39.85),
    ]]
    fillet(radyus1_edges, radius=RADYUS1_R)

    # Radyus2
    radyus2_edges = [part.edges().sort_by_distance(p)[0] for p in [
        (-18, 68.8, -25),
        (-18, 68.8, 25.7),
        (-14.5, 92.89, 30.65),
        (-14.5, 58.1, 30.65),
        (14.5, 58.1, 30.65),
        (14.5, 92.89, 30.65),
        (18, 68.8, 25.7),
        (18, 68.8, -25),
    ]]
    fillet(radyus2_edges, radius=RADYUS2_R)

    # Radyus3
    radyus3_edges = [part.edges().sort_by_distance(p)[0] for p in [
        (-18, 38.25, -10.392304845),
        (0, 38.25, -20.784609691),
        (18, 38.25, -10.392304845),
        (18, 38.25, 10.392304845),
        (0, 38.25, 20.784609691),
        (-18, 38.25, 10.392304845),
    ]]
    fillet(radyus3_edges, radius=RADYUS3_R)

    # Radyus4
    radyus4_edges = [part.edges().sort_by_distance(p)[0] for p in [
        (25.125, -11, 20.2),
    ]]
    fillet(radyus4_edges, radius=RADYUS4_R)

    # Radyus5
    radyus5_edges = [part.edges().sort_by_distance(p)[0] for p in [
        (35, 23, 35),
        (-35, 23, -35),
        (35, 23, -35),
        (-35, 23, 35),
    ]]
    fillet(radyus5_edges, radius=RADYUS5_R)

    # Radyus6
    radyus6_edges = [part.edges().sort_by_distance(p)[0] for p in [
        (25.125, -11, 10),
    ]]
    fillet(radyus6_edges, radius=RADYUS6_R)


with BuildPart() as part_1:
    # Ölçek1: scaled about (0.014012089, 30.59302606, 5.902020233)
    add(part.part.scale(L_EK1_SCALE).moved(Location((0.009668341, 21.109187981, 4.072393961))))


solid = part_1.part
